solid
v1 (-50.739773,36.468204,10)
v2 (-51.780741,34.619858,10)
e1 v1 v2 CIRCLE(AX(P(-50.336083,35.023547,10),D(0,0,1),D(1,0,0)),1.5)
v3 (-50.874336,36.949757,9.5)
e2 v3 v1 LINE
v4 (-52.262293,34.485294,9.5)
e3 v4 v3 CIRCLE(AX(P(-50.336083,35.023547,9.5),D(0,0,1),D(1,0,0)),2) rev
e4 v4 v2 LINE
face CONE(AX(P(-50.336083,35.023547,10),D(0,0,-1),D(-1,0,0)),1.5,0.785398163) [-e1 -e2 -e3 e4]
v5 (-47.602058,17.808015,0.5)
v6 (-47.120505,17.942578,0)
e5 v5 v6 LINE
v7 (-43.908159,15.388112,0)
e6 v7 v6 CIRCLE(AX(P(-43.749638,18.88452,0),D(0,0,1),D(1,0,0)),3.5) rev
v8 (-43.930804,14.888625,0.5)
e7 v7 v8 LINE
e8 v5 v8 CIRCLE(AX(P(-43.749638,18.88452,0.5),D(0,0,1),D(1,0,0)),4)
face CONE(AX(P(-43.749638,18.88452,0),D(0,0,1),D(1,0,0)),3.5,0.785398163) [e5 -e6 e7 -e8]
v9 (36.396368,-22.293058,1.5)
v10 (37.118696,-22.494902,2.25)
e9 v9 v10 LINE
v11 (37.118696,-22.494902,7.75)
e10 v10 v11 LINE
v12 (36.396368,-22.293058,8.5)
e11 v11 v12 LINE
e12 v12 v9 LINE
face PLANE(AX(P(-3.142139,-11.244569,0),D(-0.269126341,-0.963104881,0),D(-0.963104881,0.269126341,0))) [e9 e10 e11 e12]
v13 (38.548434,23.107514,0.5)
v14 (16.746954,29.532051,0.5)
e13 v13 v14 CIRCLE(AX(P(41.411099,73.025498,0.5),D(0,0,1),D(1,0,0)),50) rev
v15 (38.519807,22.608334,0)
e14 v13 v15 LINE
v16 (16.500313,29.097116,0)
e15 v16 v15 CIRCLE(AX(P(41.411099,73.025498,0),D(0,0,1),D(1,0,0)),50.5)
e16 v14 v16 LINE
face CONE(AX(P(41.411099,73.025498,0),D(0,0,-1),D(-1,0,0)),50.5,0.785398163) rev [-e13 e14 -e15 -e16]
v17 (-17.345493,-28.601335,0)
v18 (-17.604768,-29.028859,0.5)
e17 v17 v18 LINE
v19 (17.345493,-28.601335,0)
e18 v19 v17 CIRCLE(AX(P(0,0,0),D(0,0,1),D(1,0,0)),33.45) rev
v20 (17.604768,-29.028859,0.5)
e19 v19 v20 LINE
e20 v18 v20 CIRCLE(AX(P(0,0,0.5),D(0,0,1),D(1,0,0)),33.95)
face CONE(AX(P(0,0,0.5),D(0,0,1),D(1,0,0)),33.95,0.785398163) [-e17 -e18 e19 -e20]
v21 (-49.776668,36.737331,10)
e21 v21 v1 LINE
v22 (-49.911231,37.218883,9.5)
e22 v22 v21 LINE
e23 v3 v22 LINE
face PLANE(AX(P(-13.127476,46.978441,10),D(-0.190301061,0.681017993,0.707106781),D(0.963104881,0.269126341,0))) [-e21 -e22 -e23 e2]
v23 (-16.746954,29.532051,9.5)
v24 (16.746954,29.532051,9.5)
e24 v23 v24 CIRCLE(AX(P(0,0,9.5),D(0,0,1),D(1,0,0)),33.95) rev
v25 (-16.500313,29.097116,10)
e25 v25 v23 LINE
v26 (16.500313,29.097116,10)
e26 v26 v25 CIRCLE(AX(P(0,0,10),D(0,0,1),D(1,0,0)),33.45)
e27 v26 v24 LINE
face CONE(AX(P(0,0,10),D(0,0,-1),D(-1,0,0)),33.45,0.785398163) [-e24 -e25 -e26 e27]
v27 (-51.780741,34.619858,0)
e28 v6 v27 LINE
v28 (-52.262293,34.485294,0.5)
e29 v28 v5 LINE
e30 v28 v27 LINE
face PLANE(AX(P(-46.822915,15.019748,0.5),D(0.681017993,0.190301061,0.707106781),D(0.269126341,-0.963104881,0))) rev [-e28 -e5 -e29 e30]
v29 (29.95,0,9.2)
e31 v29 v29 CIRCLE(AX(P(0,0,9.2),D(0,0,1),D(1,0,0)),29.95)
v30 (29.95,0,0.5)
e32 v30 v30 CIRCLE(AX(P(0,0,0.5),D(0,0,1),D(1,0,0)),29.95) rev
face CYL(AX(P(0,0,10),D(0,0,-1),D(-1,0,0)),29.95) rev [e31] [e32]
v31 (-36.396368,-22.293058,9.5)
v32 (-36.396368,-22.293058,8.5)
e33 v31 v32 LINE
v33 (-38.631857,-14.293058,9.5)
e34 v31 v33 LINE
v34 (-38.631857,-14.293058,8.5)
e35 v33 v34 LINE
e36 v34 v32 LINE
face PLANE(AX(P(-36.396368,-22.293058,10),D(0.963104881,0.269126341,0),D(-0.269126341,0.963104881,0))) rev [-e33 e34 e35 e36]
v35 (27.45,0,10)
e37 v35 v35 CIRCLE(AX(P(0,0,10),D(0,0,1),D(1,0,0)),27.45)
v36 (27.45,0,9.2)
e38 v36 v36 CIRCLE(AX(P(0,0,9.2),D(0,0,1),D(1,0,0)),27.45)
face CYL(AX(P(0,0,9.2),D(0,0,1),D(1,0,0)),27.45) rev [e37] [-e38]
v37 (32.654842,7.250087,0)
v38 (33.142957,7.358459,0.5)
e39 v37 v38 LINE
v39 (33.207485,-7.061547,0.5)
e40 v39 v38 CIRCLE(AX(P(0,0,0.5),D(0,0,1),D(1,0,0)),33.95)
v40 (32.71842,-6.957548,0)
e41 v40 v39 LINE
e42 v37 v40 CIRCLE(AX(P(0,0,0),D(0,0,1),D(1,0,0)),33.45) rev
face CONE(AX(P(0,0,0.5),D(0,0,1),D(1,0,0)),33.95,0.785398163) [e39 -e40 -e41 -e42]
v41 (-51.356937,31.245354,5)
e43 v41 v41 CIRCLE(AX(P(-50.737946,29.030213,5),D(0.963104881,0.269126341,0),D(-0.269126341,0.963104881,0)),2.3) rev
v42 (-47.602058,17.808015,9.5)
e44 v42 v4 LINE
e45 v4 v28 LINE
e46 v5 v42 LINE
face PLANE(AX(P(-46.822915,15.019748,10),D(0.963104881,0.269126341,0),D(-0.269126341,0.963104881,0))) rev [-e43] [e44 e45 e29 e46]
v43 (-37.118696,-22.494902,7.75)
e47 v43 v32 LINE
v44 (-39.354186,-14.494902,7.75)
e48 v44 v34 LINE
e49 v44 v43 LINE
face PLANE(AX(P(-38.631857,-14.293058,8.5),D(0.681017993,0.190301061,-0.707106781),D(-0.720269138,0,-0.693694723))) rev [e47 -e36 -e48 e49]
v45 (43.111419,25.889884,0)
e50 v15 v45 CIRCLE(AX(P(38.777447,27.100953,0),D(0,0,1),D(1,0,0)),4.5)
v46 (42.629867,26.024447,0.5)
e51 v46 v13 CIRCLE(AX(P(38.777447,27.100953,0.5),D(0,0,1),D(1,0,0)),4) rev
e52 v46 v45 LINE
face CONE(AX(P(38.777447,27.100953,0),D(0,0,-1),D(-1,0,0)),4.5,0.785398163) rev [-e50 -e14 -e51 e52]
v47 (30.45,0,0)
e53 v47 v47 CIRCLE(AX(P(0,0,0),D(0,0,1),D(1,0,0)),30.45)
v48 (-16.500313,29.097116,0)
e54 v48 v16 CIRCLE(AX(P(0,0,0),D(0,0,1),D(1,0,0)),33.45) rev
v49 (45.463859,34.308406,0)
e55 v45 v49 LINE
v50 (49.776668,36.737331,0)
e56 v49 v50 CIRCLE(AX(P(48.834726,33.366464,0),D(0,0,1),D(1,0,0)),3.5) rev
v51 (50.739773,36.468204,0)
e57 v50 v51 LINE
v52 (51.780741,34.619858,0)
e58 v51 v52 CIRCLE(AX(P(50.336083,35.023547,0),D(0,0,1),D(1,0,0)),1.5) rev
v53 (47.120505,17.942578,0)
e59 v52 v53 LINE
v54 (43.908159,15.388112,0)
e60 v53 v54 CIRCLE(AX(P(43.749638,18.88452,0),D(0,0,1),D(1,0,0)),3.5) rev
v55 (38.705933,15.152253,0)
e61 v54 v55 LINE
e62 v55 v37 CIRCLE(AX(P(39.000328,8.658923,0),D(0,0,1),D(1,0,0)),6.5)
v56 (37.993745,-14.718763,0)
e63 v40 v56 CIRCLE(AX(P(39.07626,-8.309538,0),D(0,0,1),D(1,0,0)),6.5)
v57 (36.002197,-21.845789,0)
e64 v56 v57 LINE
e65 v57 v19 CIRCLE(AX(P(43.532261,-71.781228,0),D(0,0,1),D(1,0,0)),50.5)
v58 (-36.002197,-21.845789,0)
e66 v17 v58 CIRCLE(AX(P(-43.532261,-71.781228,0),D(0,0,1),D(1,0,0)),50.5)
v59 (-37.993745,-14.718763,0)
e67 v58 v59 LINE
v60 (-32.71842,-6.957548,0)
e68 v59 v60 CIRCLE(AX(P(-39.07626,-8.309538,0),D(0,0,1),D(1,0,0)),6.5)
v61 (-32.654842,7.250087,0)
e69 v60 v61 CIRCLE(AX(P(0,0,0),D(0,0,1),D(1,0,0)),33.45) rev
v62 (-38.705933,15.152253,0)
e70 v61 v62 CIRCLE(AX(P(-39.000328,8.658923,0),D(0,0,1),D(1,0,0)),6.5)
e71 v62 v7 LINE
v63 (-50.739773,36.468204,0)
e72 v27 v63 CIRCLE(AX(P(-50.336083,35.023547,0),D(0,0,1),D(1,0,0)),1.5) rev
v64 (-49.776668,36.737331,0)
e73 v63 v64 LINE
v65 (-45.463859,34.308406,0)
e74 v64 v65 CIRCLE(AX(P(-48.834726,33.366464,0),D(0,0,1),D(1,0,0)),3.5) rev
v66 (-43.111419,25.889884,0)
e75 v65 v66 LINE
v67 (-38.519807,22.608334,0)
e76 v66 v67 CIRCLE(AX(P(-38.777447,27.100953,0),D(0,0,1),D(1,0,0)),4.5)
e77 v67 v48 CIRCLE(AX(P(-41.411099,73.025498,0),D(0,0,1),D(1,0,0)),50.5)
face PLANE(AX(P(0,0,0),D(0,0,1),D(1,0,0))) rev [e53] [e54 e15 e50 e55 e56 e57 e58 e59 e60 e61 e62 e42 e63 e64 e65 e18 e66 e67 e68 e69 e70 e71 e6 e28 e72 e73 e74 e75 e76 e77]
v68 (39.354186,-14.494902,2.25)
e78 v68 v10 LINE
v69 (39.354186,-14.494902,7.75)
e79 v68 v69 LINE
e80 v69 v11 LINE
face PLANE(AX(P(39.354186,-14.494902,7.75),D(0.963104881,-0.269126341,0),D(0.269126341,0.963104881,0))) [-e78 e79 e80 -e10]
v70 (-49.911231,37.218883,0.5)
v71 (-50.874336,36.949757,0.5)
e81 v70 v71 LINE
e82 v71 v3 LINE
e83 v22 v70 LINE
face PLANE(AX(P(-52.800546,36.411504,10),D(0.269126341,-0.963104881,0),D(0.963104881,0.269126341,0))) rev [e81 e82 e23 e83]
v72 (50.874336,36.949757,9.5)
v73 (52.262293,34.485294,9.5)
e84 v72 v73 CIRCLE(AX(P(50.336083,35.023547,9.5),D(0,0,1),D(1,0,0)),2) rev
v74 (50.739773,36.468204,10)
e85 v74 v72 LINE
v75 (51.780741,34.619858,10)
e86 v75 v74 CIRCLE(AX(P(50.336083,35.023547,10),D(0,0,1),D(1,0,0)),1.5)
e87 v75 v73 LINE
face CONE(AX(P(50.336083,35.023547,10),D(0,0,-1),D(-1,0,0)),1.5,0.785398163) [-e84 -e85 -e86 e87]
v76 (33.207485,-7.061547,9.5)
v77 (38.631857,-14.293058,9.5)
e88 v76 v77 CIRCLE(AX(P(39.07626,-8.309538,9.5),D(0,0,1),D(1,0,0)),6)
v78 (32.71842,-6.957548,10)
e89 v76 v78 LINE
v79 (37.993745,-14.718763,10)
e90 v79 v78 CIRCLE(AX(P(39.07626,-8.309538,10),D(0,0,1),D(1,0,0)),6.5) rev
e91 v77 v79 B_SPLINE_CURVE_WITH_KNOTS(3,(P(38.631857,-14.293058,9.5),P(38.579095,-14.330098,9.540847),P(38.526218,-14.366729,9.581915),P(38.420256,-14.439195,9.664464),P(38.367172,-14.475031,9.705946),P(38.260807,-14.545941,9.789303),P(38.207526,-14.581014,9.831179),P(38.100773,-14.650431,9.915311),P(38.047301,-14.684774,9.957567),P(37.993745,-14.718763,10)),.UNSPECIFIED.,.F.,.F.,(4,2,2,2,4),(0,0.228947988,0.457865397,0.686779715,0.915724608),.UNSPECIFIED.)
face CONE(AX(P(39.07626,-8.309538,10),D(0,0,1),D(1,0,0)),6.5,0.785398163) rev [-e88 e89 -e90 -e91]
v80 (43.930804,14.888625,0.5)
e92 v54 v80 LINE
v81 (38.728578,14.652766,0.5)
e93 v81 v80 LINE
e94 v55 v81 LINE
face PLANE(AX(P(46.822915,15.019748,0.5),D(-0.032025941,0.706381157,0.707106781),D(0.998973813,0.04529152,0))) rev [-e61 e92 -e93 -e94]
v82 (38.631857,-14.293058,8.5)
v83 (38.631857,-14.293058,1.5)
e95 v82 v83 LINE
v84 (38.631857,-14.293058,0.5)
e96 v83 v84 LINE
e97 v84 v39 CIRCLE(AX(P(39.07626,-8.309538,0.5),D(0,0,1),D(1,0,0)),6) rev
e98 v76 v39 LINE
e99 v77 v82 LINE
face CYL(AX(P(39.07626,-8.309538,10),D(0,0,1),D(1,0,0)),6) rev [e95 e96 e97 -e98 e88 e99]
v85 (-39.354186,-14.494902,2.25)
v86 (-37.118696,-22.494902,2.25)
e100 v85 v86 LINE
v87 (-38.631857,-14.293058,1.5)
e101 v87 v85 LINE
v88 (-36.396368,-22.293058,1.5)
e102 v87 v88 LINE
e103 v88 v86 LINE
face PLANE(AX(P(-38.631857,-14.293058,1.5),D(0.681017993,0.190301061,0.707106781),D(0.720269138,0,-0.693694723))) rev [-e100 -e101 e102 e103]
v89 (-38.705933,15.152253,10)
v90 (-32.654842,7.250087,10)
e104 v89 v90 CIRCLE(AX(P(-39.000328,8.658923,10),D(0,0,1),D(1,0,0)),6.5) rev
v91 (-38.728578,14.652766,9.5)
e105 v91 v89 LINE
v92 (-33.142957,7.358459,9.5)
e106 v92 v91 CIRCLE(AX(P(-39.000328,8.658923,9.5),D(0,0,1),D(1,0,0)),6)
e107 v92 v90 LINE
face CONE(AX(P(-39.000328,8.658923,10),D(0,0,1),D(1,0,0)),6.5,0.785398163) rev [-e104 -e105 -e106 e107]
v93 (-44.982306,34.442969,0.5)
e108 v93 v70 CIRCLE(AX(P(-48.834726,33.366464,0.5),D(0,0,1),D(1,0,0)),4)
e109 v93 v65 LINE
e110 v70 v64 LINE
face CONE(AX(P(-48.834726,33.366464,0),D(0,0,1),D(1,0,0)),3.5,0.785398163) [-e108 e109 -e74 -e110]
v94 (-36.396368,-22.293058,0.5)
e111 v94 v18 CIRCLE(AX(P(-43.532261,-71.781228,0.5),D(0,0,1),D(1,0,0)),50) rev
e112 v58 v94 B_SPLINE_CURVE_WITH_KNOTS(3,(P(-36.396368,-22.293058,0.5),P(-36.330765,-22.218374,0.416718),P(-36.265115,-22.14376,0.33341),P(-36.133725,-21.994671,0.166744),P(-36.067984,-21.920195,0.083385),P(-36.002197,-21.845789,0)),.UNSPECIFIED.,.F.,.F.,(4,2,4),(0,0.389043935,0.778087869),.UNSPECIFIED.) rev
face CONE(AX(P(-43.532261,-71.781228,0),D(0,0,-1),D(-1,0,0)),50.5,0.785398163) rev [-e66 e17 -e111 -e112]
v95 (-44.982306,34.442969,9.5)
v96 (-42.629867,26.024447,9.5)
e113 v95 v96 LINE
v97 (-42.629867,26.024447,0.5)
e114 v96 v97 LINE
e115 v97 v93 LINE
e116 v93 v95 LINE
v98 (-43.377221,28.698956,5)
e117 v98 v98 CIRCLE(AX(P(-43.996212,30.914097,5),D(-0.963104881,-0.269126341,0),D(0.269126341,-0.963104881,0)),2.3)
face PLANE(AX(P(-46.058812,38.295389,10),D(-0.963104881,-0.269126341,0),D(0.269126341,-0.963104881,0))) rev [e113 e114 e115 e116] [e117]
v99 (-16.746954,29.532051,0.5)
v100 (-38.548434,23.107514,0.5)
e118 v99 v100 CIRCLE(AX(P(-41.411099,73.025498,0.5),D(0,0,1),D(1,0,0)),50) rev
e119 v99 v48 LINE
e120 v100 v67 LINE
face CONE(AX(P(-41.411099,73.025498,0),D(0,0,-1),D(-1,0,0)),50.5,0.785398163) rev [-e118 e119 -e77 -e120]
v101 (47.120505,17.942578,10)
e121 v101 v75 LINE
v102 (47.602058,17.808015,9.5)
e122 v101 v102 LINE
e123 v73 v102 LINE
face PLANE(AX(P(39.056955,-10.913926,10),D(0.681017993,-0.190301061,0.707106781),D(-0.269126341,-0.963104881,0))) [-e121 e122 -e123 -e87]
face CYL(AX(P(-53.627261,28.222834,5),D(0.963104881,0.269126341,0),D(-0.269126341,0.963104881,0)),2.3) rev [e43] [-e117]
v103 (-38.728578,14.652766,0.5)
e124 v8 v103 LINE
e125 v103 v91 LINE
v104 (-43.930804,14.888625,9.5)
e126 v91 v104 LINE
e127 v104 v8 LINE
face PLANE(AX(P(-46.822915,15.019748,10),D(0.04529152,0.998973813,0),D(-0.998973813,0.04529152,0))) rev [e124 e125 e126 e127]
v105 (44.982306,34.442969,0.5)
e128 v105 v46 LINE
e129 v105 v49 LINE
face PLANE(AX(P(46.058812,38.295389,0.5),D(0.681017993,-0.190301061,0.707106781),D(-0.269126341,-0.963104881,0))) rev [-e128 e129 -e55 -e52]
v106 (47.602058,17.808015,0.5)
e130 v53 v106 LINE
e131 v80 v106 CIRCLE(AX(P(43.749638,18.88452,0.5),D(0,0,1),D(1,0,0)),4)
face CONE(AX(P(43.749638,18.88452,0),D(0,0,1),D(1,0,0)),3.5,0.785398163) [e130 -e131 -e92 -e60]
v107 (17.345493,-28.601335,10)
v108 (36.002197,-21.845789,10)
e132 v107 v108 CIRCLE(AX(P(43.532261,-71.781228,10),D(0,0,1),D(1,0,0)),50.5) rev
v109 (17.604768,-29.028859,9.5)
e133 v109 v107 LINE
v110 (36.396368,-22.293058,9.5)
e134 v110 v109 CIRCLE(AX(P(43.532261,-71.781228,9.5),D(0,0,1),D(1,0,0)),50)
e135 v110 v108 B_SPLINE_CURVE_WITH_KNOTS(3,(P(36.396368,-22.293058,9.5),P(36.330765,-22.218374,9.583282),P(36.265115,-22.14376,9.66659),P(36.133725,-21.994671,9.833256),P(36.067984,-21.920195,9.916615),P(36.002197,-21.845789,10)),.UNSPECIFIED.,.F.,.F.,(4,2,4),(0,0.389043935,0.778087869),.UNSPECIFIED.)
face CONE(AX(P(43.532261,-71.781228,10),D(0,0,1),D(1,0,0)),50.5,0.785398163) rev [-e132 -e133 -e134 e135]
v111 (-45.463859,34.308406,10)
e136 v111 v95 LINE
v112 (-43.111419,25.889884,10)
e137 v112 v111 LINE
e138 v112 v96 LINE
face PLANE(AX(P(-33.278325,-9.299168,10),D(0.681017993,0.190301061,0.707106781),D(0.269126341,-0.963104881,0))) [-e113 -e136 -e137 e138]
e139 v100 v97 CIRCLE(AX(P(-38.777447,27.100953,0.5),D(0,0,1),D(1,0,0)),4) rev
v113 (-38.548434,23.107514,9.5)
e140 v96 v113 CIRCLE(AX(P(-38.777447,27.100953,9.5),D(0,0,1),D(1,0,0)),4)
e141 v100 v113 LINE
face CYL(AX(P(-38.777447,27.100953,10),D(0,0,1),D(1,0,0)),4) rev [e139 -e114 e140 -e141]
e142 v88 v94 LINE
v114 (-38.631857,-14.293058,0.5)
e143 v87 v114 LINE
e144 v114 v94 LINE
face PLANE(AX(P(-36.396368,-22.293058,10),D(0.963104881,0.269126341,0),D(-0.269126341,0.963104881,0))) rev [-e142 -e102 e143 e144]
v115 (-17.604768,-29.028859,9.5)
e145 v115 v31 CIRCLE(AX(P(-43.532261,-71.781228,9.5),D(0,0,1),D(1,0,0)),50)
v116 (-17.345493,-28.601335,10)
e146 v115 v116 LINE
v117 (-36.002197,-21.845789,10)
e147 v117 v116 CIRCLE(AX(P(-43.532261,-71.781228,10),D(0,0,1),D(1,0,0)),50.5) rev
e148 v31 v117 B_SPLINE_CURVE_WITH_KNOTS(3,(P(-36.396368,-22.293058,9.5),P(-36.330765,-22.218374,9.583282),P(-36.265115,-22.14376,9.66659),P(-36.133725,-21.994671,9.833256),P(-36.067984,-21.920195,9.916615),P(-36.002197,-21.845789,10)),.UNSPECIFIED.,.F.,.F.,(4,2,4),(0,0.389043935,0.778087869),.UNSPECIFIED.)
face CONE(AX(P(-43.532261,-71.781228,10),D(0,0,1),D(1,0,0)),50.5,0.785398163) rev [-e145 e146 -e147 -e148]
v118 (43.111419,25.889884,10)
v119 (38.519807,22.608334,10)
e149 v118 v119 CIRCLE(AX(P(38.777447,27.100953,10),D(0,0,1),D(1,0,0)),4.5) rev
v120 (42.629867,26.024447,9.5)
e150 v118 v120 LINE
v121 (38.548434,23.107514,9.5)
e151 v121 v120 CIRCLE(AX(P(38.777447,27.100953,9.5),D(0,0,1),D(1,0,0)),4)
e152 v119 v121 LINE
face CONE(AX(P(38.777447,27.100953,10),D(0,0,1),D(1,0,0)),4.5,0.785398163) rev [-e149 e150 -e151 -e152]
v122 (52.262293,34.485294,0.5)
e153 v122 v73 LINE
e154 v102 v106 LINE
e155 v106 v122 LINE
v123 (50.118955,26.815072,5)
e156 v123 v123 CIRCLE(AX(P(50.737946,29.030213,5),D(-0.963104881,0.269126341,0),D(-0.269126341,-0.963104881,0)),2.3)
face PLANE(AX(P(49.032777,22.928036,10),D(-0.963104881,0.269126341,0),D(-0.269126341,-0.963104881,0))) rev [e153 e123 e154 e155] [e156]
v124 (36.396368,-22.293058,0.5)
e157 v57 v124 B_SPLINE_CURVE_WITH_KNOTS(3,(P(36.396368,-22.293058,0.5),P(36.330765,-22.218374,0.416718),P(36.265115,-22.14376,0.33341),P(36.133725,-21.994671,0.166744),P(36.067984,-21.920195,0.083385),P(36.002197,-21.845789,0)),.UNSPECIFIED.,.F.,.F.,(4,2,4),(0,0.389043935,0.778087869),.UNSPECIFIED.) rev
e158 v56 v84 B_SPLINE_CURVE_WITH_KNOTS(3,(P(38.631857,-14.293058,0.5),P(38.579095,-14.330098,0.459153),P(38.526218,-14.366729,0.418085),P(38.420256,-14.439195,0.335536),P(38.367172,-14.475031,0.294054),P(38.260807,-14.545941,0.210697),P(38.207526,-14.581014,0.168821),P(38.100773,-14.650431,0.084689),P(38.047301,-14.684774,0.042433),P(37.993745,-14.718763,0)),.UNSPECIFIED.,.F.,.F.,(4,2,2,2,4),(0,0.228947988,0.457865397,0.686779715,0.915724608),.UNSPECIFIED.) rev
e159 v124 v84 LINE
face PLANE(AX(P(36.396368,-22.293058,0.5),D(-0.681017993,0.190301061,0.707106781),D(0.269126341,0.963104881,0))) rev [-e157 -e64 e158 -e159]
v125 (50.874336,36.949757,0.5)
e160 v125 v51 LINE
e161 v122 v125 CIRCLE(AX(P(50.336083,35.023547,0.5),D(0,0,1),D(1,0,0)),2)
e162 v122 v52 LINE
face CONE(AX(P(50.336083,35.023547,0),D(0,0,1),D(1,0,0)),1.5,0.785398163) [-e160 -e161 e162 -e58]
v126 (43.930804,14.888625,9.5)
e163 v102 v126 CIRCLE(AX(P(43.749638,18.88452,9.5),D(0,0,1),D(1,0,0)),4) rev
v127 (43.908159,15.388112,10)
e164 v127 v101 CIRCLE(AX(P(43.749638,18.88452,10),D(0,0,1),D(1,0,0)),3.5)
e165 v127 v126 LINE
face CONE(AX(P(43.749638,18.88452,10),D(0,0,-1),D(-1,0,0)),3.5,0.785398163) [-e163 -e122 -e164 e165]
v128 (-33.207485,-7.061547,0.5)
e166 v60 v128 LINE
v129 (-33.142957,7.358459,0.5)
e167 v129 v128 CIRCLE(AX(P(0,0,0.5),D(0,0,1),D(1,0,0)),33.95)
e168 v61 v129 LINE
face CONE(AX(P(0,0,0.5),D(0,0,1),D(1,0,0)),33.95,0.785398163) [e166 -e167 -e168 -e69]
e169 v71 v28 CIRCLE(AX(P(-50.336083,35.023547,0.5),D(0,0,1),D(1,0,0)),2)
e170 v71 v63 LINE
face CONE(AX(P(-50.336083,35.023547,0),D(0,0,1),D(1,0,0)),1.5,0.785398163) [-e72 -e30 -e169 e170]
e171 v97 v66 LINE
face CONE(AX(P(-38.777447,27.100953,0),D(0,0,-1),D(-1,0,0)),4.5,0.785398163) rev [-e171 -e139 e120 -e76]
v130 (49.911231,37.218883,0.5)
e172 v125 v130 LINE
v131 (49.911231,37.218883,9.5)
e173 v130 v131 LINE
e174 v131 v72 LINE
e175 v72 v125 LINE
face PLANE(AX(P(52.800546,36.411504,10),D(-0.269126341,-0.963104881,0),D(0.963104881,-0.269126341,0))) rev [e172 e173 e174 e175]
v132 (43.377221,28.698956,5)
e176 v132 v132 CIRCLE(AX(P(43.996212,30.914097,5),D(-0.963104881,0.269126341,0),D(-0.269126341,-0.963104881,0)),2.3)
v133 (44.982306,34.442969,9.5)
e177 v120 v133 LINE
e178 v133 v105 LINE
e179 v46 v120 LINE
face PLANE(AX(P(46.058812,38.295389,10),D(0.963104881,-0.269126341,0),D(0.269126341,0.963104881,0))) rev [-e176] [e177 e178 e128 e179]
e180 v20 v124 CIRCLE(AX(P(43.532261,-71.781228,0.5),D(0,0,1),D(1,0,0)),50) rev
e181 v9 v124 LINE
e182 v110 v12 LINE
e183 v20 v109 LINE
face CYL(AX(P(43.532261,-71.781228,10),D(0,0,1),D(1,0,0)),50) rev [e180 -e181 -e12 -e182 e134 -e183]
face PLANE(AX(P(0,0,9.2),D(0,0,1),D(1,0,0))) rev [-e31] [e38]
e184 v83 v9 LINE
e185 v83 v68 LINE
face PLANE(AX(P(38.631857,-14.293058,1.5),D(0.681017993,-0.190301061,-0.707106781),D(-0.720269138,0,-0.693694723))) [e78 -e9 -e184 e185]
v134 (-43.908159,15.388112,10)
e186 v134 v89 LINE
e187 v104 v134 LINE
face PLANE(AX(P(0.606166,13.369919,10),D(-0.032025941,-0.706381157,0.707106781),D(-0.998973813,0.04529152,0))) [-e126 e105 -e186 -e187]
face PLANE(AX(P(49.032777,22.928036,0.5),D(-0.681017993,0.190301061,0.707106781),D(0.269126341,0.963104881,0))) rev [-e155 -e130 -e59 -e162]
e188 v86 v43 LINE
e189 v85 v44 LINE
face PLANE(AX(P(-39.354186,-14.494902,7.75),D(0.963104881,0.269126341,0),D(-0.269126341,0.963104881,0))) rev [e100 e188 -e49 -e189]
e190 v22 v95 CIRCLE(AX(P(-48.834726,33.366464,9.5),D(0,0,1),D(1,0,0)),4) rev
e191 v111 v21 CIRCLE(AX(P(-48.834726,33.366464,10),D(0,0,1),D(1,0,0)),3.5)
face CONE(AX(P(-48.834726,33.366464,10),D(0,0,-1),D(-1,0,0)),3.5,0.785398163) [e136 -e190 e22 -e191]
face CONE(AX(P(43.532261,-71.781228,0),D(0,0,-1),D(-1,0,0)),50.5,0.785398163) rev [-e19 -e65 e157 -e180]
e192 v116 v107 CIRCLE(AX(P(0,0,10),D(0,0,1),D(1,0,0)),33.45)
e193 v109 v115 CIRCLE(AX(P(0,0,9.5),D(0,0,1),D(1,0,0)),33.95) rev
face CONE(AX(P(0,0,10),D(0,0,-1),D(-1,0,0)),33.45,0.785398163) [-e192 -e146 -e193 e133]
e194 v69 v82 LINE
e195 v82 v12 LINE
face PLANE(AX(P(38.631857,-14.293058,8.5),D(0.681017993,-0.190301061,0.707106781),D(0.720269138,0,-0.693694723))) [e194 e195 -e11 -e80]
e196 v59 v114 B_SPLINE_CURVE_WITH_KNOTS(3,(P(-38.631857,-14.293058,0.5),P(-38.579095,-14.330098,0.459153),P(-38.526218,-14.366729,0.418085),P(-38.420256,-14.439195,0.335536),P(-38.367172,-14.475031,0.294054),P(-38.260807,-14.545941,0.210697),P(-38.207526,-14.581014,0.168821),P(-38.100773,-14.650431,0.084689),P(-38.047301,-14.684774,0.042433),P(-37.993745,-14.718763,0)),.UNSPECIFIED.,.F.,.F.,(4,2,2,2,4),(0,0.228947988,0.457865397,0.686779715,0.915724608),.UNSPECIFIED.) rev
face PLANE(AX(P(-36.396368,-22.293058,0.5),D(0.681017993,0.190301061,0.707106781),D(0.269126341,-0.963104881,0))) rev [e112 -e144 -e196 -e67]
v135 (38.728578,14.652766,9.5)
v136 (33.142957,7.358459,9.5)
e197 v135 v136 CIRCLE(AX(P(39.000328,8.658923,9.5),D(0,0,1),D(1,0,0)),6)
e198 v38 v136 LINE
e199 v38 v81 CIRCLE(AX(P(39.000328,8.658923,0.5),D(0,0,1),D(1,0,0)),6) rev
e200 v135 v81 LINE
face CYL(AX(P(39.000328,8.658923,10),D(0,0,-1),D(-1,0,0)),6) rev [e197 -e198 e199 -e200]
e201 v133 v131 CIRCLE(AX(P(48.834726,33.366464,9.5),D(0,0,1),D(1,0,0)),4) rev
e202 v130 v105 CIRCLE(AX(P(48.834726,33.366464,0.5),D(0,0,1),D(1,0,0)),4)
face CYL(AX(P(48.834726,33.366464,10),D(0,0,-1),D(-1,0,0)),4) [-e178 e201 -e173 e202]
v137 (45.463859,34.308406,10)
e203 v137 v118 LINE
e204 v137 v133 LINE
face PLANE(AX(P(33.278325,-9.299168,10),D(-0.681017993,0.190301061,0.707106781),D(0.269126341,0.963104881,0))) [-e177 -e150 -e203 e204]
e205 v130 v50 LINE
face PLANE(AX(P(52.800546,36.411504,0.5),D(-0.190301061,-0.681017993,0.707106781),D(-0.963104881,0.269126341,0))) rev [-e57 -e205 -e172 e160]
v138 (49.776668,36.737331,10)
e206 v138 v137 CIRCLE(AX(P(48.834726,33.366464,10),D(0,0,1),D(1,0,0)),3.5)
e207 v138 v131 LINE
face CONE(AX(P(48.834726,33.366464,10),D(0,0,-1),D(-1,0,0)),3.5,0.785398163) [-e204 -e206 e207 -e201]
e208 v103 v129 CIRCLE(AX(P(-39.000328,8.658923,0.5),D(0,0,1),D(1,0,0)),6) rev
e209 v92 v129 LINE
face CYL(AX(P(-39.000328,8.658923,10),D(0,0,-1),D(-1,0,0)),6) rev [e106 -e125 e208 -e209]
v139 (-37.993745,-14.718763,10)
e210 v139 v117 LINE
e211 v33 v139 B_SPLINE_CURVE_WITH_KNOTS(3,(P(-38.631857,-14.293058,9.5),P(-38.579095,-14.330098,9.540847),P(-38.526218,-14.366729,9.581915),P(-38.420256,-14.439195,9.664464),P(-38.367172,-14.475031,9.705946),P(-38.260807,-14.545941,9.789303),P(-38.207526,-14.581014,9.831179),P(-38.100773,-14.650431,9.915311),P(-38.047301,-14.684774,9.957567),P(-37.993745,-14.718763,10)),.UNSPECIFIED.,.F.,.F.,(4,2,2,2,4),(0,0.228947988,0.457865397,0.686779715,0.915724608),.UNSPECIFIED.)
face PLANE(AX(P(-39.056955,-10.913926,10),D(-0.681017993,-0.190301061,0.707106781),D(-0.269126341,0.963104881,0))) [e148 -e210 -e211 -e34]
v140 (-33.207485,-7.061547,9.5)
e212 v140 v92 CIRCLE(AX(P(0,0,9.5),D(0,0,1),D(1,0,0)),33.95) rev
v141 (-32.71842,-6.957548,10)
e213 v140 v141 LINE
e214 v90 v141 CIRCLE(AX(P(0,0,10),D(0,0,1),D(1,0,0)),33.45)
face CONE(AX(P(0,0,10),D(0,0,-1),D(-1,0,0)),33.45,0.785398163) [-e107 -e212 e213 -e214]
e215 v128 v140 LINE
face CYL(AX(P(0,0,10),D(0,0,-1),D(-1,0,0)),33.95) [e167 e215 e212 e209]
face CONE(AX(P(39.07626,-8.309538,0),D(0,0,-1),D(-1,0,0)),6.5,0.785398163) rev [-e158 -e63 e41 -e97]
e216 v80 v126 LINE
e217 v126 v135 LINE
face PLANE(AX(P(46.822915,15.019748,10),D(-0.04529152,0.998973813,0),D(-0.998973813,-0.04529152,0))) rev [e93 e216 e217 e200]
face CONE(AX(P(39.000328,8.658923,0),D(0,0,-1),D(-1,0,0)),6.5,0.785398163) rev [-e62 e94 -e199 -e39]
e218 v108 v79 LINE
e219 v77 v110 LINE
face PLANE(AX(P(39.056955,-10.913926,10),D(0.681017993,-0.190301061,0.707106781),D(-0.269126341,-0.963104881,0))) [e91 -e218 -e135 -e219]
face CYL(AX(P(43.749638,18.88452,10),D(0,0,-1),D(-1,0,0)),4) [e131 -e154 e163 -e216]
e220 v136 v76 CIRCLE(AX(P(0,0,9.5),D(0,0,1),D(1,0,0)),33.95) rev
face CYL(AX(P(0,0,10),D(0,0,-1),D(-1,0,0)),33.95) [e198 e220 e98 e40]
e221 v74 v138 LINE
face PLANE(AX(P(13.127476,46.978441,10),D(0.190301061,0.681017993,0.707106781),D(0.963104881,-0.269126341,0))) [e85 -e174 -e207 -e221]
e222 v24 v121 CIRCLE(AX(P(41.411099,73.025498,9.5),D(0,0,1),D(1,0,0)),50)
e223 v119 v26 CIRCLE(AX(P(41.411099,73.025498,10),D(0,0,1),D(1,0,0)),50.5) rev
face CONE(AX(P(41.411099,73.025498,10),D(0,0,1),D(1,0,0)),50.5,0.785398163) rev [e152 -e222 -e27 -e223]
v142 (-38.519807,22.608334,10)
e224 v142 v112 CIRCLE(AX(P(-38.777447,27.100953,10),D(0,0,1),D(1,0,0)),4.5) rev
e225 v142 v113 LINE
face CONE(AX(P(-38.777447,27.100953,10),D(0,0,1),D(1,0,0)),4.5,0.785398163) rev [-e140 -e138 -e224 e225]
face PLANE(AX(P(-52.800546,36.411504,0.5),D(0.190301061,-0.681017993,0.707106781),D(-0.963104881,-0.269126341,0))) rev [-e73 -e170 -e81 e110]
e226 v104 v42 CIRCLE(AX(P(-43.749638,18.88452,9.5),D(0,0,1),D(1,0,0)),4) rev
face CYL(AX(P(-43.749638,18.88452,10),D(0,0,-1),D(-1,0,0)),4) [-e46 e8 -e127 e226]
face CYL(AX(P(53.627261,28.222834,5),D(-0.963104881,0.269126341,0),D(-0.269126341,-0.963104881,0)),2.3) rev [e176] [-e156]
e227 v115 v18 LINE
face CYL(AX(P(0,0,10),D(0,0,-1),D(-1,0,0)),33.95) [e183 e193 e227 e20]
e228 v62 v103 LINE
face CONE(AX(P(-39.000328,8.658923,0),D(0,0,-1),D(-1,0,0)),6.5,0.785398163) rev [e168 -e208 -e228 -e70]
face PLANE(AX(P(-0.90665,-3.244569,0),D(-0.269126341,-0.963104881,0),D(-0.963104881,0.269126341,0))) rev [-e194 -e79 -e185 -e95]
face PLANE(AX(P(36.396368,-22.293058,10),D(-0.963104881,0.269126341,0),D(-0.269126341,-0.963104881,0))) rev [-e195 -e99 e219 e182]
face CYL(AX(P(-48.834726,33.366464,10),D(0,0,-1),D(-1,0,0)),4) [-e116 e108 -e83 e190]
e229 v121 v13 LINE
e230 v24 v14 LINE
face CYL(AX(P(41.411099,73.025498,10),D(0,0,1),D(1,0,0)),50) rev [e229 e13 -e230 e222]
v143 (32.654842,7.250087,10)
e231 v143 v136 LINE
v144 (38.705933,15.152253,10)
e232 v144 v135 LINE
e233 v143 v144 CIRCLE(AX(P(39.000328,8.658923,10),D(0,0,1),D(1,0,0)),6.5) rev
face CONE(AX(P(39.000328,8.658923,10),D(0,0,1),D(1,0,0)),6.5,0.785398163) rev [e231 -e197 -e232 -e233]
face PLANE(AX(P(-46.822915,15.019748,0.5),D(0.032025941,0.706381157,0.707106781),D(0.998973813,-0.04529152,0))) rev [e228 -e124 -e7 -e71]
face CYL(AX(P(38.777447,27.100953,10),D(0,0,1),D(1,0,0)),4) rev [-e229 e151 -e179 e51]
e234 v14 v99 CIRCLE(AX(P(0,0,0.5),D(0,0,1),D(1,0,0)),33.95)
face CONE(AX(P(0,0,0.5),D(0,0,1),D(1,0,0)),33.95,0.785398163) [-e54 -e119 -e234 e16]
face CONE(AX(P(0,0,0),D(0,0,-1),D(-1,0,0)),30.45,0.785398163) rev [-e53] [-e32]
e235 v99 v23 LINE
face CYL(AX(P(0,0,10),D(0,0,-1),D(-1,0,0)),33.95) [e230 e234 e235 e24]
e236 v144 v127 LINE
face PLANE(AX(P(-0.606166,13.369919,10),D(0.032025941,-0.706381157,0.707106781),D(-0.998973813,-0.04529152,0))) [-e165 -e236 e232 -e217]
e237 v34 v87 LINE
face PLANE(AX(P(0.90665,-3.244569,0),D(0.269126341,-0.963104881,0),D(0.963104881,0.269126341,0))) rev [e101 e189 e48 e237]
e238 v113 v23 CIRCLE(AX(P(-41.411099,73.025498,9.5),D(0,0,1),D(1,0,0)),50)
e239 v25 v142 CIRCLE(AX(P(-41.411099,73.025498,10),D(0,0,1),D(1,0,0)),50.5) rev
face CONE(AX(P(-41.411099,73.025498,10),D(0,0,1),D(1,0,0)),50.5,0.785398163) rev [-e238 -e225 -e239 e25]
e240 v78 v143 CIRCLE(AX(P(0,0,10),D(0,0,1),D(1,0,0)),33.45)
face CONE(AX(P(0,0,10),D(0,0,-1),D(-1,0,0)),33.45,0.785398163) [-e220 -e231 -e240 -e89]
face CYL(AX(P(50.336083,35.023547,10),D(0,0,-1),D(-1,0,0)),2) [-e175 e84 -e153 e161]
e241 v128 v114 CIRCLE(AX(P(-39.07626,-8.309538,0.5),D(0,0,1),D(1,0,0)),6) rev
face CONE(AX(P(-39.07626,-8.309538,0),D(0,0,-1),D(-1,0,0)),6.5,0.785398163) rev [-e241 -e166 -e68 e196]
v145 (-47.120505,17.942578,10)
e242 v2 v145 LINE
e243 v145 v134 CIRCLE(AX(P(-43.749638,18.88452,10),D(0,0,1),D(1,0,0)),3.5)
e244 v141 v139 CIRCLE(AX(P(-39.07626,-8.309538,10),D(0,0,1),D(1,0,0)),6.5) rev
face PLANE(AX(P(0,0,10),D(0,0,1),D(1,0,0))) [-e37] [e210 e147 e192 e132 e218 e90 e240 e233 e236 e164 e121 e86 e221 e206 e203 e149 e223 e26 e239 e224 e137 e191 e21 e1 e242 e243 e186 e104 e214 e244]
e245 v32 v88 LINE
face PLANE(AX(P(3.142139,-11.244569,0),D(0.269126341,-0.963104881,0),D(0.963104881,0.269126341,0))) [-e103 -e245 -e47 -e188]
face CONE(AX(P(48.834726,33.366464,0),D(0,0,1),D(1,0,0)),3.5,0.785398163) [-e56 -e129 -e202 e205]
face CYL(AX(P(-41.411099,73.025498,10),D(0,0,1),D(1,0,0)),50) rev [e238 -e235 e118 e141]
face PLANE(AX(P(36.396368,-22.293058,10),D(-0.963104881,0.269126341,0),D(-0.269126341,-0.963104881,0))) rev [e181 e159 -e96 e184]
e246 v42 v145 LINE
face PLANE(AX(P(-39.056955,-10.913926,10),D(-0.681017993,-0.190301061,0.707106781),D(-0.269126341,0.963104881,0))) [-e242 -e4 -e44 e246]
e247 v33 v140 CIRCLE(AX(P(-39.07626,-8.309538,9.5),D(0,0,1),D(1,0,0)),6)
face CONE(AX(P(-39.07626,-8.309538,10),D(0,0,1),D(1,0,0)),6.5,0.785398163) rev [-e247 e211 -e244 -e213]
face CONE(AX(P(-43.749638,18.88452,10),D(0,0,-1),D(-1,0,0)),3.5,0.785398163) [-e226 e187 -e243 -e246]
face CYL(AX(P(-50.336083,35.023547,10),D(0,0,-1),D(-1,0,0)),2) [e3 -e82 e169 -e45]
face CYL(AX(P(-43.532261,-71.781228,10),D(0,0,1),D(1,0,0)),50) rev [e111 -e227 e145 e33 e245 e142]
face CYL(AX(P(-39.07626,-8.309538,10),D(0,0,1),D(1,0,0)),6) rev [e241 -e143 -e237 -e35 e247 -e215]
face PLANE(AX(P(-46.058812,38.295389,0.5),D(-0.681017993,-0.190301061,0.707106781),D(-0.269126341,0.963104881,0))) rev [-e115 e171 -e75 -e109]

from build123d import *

# Parameters (mm, degrees)
SKIZZE1_R                       = 29.95
AUFSATZ_LINEAR_AUSTRAGEN1_DEPTH = 10
SKIZZE2_R                       = 32.75
SKIZZE2_R_2                     = 27.45
AUFSATZ_LINEAR_AUSTRAGEN2_DEPTH = 0.8
SKIZZE5_R                       = 2.3
SCHNITT_LINEAR_AUSTRAGEN1_DEPTH = 10
VERRUNDUNG1_R                   = 50
VERRUNDUNG2_R                   = 6
VERRUNDUNG3_R                   = 4
AUFSATZ_LINEAR_AUSTRAGEN3_DEPTH = 8.306468
FILLET1_R                       = 2
CHAMFER1_SIZE                   = 0.5


with BuildPart() as part:
    # Skizze1 → Aufsatz-Linear austragen1 (new body)
    with BuildSketch(Plane.XY):
        with BuildLine():
            Line((-25.605118216, -22.29305769), (-36.396367746, -22.29305769))
            Line((-36.396367746, -22.29305769), (-38.631857121, -14.29305769))
            Line((-38.631857121, -14.29305769), (-30.794658658, -14.29305769))
            ThreePointArc((-30.794658658, -14.29305769), (-33.95, 0), (-30.794658658, 14.29305769))
            Line((-30.794658658, 14.29305769), (-46.822915195, 15.019747505))
            Line((-46.822915195, 15.019747505), (-49.03277701, 22.928035825))
            Line((-49.03277701, 22.928035825), (-52.800545787, 36.411504164))
            Line((-52.800545787, 36.411504164), (-46.058811618, 38.295388553))
            Line((-46.058811618, 38.295388553), (-41.792257863, 23.026950955))
            Line((-41.792257863, 23.026950955), (-25.605118216, 22.29305769))
            ThreePointArc((-25.605118216, 22.29305769), (0, 33.95), (25.605118216, 22.29305769))
            Line((25.605118216, 22.29305769), (41.792257863, 23.026950955))
            Line((41.792257863, 23.026950955), (46.058811618, 38.295388553))
            Line((46.058811618, 38.295388553), (52.800545787, 36.411504164))
            Line((52.800545787, 36.411504164), (49.03277701, 22.928035825))
            Line((49.03277701, 22.928035825), (46.822915195, 15.019747505))
            Line((46.822915195, 15.019747505), (30.794658658, 14.29305769))
            ThreePointArc((30.794658658, 14.29305769), (33.95, 0), (30.794658658, -14.29305769))
            Line((30.794658658, -14.29305769), (38.631857121, -14.29305769))
            Line((38.631857121, -14.29305769), (36.396367746, -22.29305769))
            Line((36.396367746, -22.29305769), (25.605118216, -22.29305769))
            ThreePointArc((25.605118216, -22.29305769), (0, -33.95), (-25.605118216, -22.29305769))
        make_face()
        Circle(SKIZZE1_R, mode=Mode.SUBTRACT)
    extrude(amount=AUFSATZ_LINEAR_AUSTRAGEN1_DEPTH)

    # Skizze2 → Aufsatz-Linear austragen2 (add)
    with BuildSketch(Plane.XY.offset(10)):
        Circle(SKIZZE2_R)
        Circle(SKIZZE2_R_2, mode=Mode.SUBTRACT)
    extrude(amount=-AUFSATZ_LINEAR_AUSTRAGEN2_DEPTH)

    # Skizze5 → Schnitt-Linear austragen1 (cut)
    with BuildSketch(Plane(origin=(32.796772797, -9.164604643, 0), x_dir=(0, 0, 1), z_dir=(-0.9631048813334842, 0.2691263412444341, 0))):
        with Locations(Location((5, 41.61405755, 0), (0, 0, 270))):
            Circle(SKIZZE5_R)
    schnitt_linear_austragen1 = extrude(amount=-SCHNITT_LINEAR_AUSTRAGEN1_DEPTH, mode=Mode.SUBTRACT)

    # Spiegeln1: Schnitt-Linear austragen1 across plane
    add(schnitt_linear_austragen1.mirror(Plane(origin=(0, 0, 0), x_dir=(0, 0, 1), z_dir=(1, 0, 0))), mode=Mode.SUBTRACT)

    # Verrundung1
    # the kernel refuses this fillet: 50 mm, written as the material it adds along each edge
    with BuildSketch(Plane(origin=(-25.605118216, 22.29305769, 0), x_dir=(-0.9989738125947814, 0.045291519623947715, 0), z_dir=(0, 0, 1))) as verrundung1_piece_1:
        with BuildLine():
            CenterArc((18.087510266, -49.964502541), VERRUNDUNG1_R, 92.159120897, 29.993366161)
            Line((-8.521208788, -7.632764208), (-9.053383169, -6.786129441))
            ThreePointArc((-9.053383169, -6.786129441), (-4.604005024, -3.433010053), (-0.783167276, 0.621811079))
            Line((-0.783167276, 0.621811079), (0, 1))
            ThreePointArc((0, 1), (8.101883875, 1), (16.1660929, 0.999290051))
            Line((16.1660929, 0.999290051), (16.20376775, 0))
        make_face()
    extrude(amount=10)
    with BuildSketch(Plane(origin=(25.605118216, 22.29305769, 0), x_dir=(-0.7743254156963487, 0.6327876030760059, 0), z_dir=(0, 0, 1))) as verrundung1_piece_2:
        with BuildLine():
            CenterArc((19.863886687, -49.285246753), VERRUNDUNG1_R, 99.699501479, 29.993366161)
            Line((-12.069715077, -10.811293506), (-12.708387112, -10.041814441))
            ThreePointArc((-12.708387112, -10.041814441), (-6.702066157, -4.660775852), (-0.667208619, 0.744870901))
            Line((-0.667208619, 0.744870901), (0.168480803, 0.985704935))
            ThreePointArc((0.168480803, 0.985704935), (5.719923266, 0.514682545), (11.271365728, 0.985704935))
            Line((11.271365728, 0.985704935), (11.439846531, 0))
        make_face()
    extrude(amount=10)
    with BuildSketch(Plane(origin=(-25.605118216, -22.29305769, 0), x_dir=(-1, 0, 0), z_dir=(0, 0, 1))) as verrundung1_piece_3:
        with BuildLine():
            CenterArc((17.927143088, 49.488170537), VERRUNDUNG1_R, 238.764970405, 23.029881184)
            Line((-8.000350244, 6.735801135), (-8.51890011, 5.880753747))
            ThreePointArc((-8.51890011, 5.880753747), (-4.38330809, 2.912839933), (-0.754200831, -0.65664382))
            Line((-0.754200831, -0.65664382), (0, -1))
            ThreePointArc((0, -1), (5.395624765, -1), (10.648531659, -0.989763411))
            Line((10.648531659, -0.989763411), (10.79124953, 0))
        make_face()
    extrude(amount=10)
    with BuildSketch(Plane(origin=(25.605118216, -22.29305769, 0), x_dir=(-0.7649741312009661, -0.6440610053351523, 0), z_dir=(0, 0, 1))) as verrundung1_piece_4:
        with BuildLine():
            CenterArc((18.15960016, 49.403344062), VERRUNDUNG1_R, 238.109839077, 23.029881184)
            Line((-8.255026734, 6.950223021), (-8.783319272, 6.1011606))
            ThreePointArc((-8.783319272, 6.1011606), (-4.771574372, 2.710137379), (-0.644061005, -0.764974131))
            Line((-0.644061005, -0.764974131), (0.154025447, -0.988066881))
            ThreePointArc((0.154025447, -0.988066881), (5.229163914, -0.594870618), (10.304302381, -0.988066881))
            Line((10.304302381, -0.988066881), (10.458327827, 0))
        make_face()
    extrude(amount=10)

    # Verrundung2
    # the kernel refuses this fillet: 6 mm, written as the material it adds along each edge
    with BuildSketch(Plane(origin=(-30.794658658, -14.29305769, 0), x_dir=(-0.31650196905899364, 0.9485918530020063, 0), z_dir=(0, 0, 1))) as verrundung2_piece_1_section:
        with BuildLine():
            CenterArc((8.297060958, 5.962063603), VERRUNDUNG2_R, 165.796112126, 97.757459861)
            Line((2.480488745, 7.434302612), (2.364157301, 7.463747393))
            ThreePointArc((2.364157301, 7.463747393), (1.12641335, 3.755131543), (-0.113831022, 0.037980236))
            Line((-0.113831022, 0.037980236), (0.0134729, -0.119241272))
            ThreePointArc((0.0134729, -0.119241272), (3.811707977, 0.094656778), (7.609943054, -0.119241272))
            Line((7.609943054, -0.119241272), (7.623415954, 0))
        make_face()
    verrundung2_piece_1 = extrude(amount=10, mode=Mode.PRIVATE)
    verrundung2_piece_1 = split(verrundung2_piece_1, bisect_by=Plane(origin=(-38.694932937, -14.067332385, 5), z_dir=(0.9631048813334845, 0.2691263412444326, 0)), keep=Keep.TOP, mode=Mode.PRIVATE)
    add(verrundung2_piece_1)
    with BuildSketch(Plane(origin=(30.794658658, -14.29305769, 0), x_dir=(1, 0, 0), z_dir=(0, 0, 1))) as verrundung2_piece_2_section:
        with BuildLine():
            CenterArc((8.281601092, 5.983519558), VERRUNDUNG2_R, 167.994917884, 97.757459861)
            Line((2.412826161, 7.231510266), (2.295450662, 7.256470081))
            ThreePointArc((2.295450662, 7.256470081), (1.296203729, 3.585796077), (-0.1088471, 0.050520381))
            Line((-0.1088471, 0.050520381), (0, -0.12))
            ThreePointArc((0, -0.12), (3.918599232, -0.12), (7.828310411, -0.119670391))
            Line((7.828310411, -0.119670391), (7.837198463, 0))
        make_face()
    verrundung2_piece_2 = extrude(amount=10, mode=Mode.PRIVATE)
    verrundung2_piece_2 = split(verrundung2_piece_2, bisect_by=Plane(origin=(38.694932937, -14.067332385, 5), z_dir=(-0.9631048813334845, 0.2691263412444326, 0)), keep=Keep.TOP, mode=Mode.PRIVATE)
    add(verrundung2_piece_2)
    with BuildSketch(Plane(origin=(30.794658658, 14.29305769, 0), x_dir=(0.320743613458383, -0.9471660543039216, 0), z_dir=(0, 0, 1))) as verrundung2_piece_3:
        with BuildLine():
            CenterArc((7.9683768, 5.965018375), VERRUNDUNG2_R, 163.887999515, 99.921963772)
            Line((2.204050499, 7.630113658), (2.088763973, 7.663415564))
            Line((2.088763973, 7.663415564), (-0.115286526, 0.033301906))
            Line((-0.115286526, 0.033301906), (0.012939177, -0.119300368))
            ThreePointArc((0.012939177, -0.119300368), (3.660708963, 0.077937694), (7.308478748, -0.119300368))
            Line((7.308478748, -0.119300368), (7.321417925, 0))
        make_face()
    extrude(amount=10)
    with BuildSketch(Plane(origin=(-30.794658658, 14.29305769, 0), x_dir=(-0.9989738125947842, 0.045291519623885015, 0), z_dir=(0, 0, 1))) as verrundung2_piece_4:
        with BuildLine():
            CenterArc((7.942069821, 6), VERRUNDUNG2_R, 170.078036228, 99.921963772)
            Line((2.031809742, 7.033840317), (1.91360454, 7.054517124))
            ThreePointArc((1.91360454, 7.054517124), (1.090781254, 3.495291211), (-0.111023547, 0.045538687))
            Line((-0.111023547, 0.045538687), (0, -0.12))
            Line((0, -0.12), (7.942069821, -0.12))
            Line((7.942069821, -0.12), (7.942069821, 0))
        make_face()
    extrude(amount=10)

    # Verrundung3
    verrundung3_edges = [part.edges().sort_by_distance(p)[0] for p in [
        (41.792257863, 23.026950955, 5),
        (46.058811618, 38.295388553, 5),
        (46.822915195, 15.019747505, 5),
        (-46.822915195, 15.019747505, 5),
        (-46.058811618, 38.295388553, 5),
        (-41.792257863, 23.026950955, 5),
    ]]
    fillet(verrundung3_edges, radius=VERRUNDUNG3_R)

    # Skizze6 → Aufsatz-Linear austragen3 (add)
    with BuildSketch(Plane(origin=(3.142139221, -11.244568658, 0), x_dir=(0, 0, -1), z_dir=(-0.26912634124443263, 0.9631048813334845, 0))):
        Polygon((-8.5, 41.05316849), (-7.75, 41.80316849), (-2.25, 41.80316849), (-1.5, 41.05316849), align=None)
    aufsatz_linear_austragen3 = extrude(amount=AUFSATZ_LINEAR_AUSTRAGEN3_DEPTH)

    # Mirror1: Aufsatz-Linear austragen3 across plane
    add(aufsatz_linear_austragen3.mirror(Plane(origin=(0, 0, 0), x_dir=(0, 0, 1), z_dir=(1, 0, 0))))

    # Fillet1
    fillet1_edges = [part.edges().sort_by_distance(p)[0] for p in [
        (52.800545787, 36.411504164, 5),
        (-52.800545787, 36.411504164, 5),
    ]]
    fillet(fillet1_edges, radius=FILLET1_R)

    # Chamfer1
    chamfer1_edges = [part.edges().sort_by_distance(p)[0] for p in [
        (-33.949660085, 0.151921409, 0),
        (-33.949660085, 0.151921409, 10),
        (33.949660085, 0.151921409, 0),
        (33.949660085, 0.151921409, 10),
        (41.329691449, 14.77069548, 0),
        (41.329691449, 14.77069548, 10),
        (-34.27649539, -11.909852297, 0),
        (-34.27649539, -11.909852297, 10),
        (34.27649539, -11.909852297, 0),
        (34.27649539, -11.909852297, 10),
        (34.236583606, 12.306764188, 0),
        (34.236583606, 12.306764188, 10),
        (-34.236583606, 12.306764188, 0),
        (-34.236583606, 12.306764188, 10),
        (-41.329691449, 14.77069548, 0),
        (-41.329691449, 14.77069548, 10),
        (43.806086505, 30.233708145, 0),
        (49.932175512, 26.146654573, 0),
        (-50.392783584, 37.084320017, 0),
        (-43.806086505, 30.233708145, 0),
        (-27.277805641, 25.064576342, 0),
        (-46.871858051, 36.851739876, 0),
        (46.871858051, 36.851739876, 0),
        (46.239249313, 15.753731476, 0),
        (-46.239249313, 15.753731476, 0),
        (43.806086505, 30.233708145, 10),
        (27.277805641, 25.064576342, 10),
        (-43.806086505, 30.233708145, 10),
        (-50.392783584, 37.084320017, 10),
        (49.932175512, 26.146654573, 10),
        (-46.871858051, 36.851739876, 10),
        (46.871858051, 36.851739876, 10),
        (46.239249313, 15.753731476, 10),
        (-46.239249313, 15.753731476, 10),
        (41.103257504, 23.846631411, 0),
        (41.103257504, 23.846631411, 10),
        (-41.103257504, 23.846631411, 0),
        (-41.103257504, 23.846631411, 10),
        (-49.932175512, 26.146654573, 0),
        (-49.932175512, 26.146654573, 10),
        (50.392783584, 37.084320017, 0),
        (52.078721449, 36.004980947, 0),
        (-52.078721449, 36.004980947, 0),
        (50.392783584, 37.084320017, 10),
        (52.078721449, 36.004980947, 10),
        (-52.078721449, 36.004980947, 10),
        (37.514112433, -18.29305769, 0),
        (-37.514112433, -18.29305769, 0),
        (-37.514112433, -18.29305769, 10),
        (37.514112433, -18.29305769, 10),
        (-29.95, 0, 0),
        (0, -33.95, 0),
        (0, -33.95, 10),
        (0, 33.95, 0),
        (0, 33.95, 10),
        (-26.660994535, -24.713613484, 0),
        (-26.660994535, -24.713613484, 10),
        (26.660994535, -24.713613484, 0),
        (26.660994535, -24.713613484, 10),
        (-27.277805641, 25.064576342, 10),
        (27.277805641, 25.064576342, 0),
    ]]
    chamfer(chamfer1_edges, length=CHAMFER1_SIZE)


solid = part.part
